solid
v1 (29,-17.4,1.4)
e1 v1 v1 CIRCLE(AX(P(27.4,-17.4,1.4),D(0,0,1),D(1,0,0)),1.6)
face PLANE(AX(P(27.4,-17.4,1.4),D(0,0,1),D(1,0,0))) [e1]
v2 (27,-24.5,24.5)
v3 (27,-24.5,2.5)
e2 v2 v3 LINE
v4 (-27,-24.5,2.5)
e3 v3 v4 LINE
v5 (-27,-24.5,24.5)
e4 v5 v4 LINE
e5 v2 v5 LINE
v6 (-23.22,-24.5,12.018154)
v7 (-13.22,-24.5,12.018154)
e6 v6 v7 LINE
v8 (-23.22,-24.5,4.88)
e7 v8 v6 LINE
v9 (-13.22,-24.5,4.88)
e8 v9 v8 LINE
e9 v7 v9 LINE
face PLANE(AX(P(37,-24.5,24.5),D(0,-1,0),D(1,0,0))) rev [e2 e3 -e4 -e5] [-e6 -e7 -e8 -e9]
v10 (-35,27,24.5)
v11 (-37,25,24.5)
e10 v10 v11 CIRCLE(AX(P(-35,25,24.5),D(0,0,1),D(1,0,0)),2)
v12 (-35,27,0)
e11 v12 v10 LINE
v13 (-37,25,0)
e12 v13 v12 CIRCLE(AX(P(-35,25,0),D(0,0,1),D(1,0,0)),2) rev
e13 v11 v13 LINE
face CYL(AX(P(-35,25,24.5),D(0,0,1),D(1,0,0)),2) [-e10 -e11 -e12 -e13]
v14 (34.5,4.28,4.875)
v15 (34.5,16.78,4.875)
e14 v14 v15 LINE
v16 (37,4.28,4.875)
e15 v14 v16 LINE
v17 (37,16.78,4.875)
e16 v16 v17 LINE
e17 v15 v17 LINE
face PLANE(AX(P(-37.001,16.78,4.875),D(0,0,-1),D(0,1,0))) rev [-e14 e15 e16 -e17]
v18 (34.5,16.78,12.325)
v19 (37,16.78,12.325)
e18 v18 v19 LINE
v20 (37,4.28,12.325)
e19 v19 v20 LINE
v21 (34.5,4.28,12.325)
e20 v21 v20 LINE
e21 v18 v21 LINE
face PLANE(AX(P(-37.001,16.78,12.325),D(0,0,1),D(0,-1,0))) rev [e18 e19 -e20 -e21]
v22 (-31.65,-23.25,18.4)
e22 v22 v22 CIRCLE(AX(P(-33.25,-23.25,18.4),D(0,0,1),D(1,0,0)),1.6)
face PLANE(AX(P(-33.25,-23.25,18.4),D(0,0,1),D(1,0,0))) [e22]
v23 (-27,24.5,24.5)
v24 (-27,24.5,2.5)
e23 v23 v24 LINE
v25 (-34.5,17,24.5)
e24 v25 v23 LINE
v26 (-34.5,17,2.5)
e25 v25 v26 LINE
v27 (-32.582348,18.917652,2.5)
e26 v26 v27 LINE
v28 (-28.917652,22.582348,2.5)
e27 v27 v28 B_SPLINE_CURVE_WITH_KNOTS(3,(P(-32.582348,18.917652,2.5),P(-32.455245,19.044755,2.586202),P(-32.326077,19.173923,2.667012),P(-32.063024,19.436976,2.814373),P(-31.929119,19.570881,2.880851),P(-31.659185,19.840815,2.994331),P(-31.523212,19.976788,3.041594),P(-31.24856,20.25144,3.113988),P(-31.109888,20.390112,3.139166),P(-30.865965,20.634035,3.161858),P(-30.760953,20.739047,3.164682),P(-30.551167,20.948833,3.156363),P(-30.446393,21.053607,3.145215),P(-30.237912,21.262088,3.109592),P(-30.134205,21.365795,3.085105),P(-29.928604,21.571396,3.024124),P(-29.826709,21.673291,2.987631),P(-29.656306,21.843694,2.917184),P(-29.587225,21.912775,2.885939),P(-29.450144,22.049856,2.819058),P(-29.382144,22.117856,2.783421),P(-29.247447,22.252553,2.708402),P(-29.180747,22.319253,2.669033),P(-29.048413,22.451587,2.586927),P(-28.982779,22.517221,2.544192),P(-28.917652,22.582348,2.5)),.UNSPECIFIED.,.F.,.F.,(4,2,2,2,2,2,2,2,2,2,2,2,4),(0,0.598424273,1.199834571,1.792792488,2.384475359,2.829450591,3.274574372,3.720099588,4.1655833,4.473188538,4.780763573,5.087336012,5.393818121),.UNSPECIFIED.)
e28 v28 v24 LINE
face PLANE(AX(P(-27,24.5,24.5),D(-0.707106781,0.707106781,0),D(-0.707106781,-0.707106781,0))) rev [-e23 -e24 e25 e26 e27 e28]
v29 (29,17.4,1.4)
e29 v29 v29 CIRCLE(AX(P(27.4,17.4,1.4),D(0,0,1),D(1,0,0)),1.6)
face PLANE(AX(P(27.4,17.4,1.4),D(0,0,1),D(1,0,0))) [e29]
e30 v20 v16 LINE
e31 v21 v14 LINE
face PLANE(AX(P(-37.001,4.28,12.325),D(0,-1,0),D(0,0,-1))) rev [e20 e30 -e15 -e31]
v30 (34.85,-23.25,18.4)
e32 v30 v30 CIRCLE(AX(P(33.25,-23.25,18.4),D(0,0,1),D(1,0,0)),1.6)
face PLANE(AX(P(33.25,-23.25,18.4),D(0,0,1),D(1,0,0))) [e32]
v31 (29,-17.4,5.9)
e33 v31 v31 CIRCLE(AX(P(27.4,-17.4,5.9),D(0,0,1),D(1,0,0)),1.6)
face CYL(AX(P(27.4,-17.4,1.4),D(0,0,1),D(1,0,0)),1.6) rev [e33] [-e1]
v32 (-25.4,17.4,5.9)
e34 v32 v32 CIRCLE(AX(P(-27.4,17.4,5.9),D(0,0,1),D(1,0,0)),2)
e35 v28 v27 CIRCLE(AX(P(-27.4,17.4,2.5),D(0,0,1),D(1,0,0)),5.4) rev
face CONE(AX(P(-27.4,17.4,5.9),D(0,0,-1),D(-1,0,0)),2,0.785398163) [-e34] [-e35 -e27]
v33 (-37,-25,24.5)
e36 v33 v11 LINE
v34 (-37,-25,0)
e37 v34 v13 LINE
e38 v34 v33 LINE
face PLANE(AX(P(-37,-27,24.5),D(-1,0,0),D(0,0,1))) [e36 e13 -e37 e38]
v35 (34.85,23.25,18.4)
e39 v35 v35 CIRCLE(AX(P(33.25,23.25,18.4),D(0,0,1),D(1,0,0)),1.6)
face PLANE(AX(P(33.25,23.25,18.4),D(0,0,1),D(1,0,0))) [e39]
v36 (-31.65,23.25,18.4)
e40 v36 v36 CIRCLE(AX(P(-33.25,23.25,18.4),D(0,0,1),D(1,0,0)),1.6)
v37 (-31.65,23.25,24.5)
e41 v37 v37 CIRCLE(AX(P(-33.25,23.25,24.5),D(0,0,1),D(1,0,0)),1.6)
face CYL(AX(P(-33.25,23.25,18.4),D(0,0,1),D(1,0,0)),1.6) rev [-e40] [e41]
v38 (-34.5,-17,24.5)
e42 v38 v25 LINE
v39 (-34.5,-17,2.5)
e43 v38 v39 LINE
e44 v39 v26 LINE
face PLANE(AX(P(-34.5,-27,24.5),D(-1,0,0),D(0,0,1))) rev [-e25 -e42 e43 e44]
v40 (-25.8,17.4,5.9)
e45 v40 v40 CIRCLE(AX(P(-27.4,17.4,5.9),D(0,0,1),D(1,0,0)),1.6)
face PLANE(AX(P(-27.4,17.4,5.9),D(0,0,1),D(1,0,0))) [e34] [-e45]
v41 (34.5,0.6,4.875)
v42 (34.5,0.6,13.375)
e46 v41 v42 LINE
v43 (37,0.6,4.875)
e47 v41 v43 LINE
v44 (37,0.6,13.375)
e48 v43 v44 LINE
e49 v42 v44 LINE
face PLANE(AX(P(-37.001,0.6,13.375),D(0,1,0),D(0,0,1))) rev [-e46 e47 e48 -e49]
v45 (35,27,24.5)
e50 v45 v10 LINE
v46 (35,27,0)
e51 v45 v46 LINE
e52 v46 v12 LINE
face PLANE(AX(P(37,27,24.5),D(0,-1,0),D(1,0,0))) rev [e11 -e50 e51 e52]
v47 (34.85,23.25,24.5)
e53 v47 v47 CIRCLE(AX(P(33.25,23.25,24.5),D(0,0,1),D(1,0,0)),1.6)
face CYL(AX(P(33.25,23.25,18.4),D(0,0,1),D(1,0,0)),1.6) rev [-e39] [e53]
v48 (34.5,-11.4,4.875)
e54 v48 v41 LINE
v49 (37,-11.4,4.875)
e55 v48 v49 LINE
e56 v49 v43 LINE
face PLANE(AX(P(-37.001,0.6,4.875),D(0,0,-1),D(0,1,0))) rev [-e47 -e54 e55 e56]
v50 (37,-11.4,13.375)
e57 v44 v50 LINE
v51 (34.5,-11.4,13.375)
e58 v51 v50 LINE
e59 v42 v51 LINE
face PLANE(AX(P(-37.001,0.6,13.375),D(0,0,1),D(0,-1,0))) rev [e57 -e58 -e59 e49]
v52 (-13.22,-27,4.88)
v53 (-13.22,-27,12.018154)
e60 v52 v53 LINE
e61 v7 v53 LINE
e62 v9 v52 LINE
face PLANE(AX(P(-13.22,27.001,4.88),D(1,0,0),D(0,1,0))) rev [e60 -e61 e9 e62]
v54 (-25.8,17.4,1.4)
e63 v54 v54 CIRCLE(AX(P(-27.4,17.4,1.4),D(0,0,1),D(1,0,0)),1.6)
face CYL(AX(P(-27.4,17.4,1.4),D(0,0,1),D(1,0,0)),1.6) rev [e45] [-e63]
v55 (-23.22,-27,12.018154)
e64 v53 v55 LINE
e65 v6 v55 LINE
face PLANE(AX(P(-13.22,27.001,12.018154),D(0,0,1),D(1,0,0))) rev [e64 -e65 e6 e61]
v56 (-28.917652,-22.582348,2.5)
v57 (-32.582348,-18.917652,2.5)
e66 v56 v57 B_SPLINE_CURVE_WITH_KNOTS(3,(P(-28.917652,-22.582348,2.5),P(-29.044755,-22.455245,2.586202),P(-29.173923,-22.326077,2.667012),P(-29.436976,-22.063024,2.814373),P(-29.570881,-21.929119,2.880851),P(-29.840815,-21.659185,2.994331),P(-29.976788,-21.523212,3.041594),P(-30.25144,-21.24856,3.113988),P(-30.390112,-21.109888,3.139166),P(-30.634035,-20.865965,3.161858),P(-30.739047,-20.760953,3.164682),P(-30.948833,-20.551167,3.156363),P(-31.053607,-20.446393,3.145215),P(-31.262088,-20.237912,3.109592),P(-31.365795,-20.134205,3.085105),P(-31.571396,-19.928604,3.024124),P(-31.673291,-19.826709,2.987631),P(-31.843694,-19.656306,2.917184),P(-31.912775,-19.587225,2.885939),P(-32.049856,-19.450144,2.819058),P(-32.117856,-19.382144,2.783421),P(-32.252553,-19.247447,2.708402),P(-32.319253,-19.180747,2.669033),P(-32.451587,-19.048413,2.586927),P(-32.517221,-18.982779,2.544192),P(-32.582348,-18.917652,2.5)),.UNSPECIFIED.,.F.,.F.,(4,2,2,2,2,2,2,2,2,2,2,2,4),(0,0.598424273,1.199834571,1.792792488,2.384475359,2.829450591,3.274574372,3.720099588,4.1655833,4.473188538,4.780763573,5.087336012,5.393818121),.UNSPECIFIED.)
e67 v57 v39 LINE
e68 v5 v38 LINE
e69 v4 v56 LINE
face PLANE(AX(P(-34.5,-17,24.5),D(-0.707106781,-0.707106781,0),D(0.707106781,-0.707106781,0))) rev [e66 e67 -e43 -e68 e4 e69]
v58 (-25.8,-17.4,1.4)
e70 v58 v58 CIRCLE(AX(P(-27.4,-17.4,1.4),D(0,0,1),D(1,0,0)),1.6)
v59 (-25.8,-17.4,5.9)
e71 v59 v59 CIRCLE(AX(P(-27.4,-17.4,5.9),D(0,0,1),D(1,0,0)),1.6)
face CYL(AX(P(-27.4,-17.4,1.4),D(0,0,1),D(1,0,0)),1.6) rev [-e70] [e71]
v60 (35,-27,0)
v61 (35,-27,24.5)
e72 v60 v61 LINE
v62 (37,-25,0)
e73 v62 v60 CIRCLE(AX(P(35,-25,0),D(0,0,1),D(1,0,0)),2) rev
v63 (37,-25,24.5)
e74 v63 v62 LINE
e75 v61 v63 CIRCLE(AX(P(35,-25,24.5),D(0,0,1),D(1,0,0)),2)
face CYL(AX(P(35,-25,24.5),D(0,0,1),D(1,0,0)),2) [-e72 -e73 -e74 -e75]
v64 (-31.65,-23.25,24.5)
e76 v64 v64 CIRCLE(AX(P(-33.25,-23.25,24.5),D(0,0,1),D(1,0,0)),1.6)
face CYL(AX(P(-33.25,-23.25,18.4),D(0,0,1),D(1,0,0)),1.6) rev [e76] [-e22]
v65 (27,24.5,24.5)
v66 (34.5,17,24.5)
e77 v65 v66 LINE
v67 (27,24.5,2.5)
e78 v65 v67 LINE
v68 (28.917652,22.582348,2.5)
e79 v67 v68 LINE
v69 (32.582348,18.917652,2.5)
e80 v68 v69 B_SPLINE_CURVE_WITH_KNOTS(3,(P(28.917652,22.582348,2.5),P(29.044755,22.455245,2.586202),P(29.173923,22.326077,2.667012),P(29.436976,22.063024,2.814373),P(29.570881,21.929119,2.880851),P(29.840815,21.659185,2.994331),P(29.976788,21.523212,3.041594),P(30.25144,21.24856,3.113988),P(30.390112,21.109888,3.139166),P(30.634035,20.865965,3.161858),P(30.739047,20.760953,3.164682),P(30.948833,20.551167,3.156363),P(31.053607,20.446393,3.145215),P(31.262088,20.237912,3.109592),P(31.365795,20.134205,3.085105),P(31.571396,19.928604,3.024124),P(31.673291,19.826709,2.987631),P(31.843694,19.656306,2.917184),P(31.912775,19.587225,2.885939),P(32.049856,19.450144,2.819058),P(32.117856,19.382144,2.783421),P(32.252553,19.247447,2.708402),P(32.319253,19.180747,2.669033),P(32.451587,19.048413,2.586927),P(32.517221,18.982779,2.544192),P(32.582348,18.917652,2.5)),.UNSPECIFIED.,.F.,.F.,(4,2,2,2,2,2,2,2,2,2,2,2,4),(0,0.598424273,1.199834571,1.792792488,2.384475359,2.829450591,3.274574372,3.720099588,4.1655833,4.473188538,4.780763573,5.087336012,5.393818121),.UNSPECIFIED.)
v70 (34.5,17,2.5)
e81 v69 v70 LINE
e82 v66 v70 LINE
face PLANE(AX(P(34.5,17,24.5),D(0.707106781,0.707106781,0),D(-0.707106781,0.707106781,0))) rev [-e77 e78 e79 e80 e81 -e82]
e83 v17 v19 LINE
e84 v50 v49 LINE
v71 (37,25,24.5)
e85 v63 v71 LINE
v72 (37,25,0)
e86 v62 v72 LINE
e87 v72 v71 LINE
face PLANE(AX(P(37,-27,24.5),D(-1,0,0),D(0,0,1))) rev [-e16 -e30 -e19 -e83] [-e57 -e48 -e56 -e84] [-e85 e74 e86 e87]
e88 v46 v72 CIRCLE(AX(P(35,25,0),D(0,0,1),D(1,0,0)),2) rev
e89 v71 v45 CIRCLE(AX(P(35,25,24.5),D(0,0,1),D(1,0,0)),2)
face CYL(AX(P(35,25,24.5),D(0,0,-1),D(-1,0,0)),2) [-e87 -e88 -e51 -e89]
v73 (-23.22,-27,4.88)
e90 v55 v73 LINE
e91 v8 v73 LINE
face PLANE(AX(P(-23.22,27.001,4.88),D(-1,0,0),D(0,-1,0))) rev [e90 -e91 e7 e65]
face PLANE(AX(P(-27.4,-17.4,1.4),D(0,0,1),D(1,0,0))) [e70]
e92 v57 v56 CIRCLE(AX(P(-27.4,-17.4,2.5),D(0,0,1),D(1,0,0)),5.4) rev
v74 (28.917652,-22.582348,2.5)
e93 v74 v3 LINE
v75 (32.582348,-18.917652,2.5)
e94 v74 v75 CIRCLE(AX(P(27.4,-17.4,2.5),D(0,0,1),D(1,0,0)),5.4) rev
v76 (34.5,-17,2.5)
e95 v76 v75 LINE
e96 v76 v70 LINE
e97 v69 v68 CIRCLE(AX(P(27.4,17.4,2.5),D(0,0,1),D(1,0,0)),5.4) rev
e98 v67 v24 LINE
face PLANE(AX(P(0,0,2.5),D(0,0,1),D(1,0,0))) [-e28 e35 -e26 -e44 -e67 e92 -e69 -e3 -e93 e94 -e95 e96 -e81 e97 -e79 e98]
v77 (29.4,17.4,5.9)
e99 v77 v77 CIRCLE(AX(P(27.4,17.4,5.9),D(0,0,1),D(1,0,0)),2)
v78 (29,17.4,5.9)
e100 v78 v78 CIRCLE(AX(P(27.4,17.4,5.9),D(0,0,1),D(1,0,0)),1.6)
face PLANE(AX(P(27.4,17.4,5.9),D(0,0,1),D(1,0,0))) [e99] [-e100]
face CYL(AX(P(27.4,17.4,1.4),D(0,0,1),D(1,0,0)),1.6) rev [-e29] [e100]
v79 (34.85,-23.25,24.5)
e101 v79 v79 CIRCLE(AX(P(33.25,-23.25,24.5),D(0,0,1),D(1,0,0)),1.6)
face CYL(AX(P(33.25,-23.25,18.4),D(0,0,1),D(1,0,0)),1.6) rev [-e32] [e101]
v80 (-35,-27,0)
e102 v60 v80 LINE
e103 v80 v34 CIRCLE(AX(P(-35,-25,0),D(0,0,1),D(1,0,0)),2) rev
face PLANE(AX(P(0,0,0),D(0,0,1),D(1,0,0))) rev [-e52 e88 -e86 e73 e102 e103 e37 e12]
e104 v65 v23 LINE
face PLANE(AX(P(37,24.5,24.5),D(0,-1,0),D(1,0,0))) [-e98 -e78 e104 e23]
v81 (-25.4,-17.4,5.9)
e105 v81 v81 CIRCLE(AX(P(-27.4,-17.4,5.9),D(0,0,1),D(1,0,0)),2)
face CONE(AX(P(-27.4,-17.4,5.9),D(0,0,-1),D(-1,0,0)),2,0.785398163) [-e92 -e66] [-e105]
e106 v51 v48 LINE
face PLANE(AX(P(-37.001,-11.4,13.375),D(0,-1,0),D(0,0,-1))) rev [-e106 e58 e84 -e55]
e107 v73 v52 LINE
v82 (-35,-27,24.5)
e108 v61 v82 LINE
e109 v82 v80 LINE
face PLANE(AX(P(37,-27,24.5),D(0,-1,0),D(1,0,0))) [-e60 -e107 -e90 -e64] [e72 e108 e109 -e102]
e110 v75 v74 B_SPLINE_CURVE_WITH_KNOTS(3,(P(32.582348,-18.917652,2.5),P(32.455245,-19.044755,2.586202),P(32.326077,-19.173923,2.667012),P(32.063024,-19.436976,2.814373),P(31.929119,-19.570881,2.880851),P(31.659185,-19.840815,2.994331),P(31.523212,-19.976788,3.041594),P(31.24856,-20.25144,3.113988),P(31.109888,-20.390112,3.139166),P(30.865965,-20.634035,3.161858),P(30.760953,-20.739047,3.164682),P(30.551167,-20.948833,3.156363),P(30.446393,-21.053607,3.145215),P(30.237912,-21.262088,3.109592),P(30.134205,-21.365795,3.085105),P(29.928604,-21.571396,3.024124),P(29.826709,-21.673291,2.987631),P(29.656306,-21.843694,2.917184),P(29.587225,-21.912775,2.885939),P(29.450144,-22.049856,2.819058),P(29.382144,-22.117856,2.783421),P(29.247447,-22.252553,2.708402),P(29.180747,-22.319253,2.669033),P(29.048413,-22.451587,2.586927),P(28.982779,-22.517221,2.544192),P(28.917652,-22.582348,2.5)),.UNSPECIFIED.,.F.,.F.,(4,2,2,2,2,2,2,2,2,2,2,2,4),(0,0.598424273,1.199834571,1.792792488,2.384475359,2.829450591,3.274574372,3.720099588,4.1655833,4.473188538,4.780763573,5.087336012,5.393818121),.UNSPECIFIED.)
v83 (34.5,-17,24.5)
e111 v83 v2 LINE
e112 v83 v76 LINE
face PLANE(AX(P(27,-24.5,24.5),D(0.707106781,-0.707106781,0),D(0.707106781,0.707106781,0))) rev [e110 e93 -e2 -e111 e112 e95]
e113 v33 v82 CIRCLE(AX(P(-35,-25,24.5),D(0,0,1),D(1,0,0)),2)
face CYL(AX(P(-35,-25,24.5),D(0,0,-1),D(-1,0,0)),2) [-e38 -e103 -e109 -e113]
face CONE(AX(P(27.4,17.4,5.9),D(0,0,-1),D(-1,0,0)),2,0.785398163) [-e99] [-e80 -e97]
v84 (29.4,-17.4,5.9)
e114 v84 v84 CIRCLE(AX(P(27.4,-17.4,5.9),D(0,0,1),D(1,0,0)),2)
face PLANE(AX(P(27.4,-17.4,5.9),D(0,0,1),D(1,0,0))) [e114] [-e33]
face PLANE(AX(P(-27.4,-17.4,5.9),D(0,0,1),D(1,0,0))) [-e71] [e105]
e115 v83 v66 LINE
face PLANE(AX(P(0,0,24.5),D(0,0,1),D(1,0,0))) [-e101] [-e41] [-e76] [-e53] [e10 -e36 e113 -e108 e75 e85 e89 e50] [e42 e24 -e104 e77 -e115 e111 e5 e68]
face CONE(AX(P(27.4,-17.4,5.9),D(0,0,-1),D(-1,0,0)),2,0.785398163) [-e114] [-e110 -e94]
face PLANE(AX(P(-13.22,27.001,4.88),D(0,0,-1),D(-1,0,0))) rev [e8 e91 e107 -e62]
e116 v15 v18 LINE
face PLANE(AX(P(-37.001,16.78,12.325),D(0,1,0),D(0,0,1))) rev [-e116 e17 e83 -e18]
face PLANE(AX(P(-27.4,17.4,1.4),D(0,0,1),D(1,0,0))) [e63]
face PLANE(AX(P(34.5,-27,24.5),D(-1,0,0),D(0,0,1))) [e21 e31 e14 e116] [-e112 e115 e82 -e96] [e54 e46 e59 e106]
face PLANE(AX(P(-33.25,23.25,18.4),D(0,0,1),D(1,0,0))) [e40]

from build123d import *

# Parameters (mm, degrees)
SKETCH5_W           = 74
SKETCH5_H           = 54
BOSS_EXTRUDE4_DEPTH = 24.5
SHELL1_T            = -2.5
SKETCH6_R           = 2
BOSS_EXTRUDE5_DEPTH = 3.4
SKETCH11_R          = 1.6
CUT_EXTRUDE2_DEPTH  = 4.5
CUT_EXTRUDE4_REACH  = 84.494
SKETCH12_W          = 7.45
SKETCH12_H          = 12.5
CUT_EXTRUDE5_REACH  = 84.494
SKETCH13_W          = 8.5
SKETCH13_H          = 12
CUT_EXTRUDE6_REACH  = 71.895
SKETCH14_W          = 10
SKETCH14_H          = 7.138154435
BOSS_EXTRUDE7_DEPTH = 22
SKETCH9_R           = 1.6
CUT_EXTRUDE1_DEPTH  = 6.1
CHAMFER10_SIZE      = 3.4
CHAMFER11_SIZE      = 3.4
FILLET1_R           = 2


with BuildPart() as part:
    # Sketch5 → Boss-Extrude4 (new body)
    with BuildSketch(Plane.XY):
        Rectangle(SKETCH5_W, SKETCH5_H)
    extrude(amount=BOSS_EXTRUDE4_DEPTH)

    # Shell1
    shell1_openings = [part.faces().sort_by_distance(p)[0] for p in [
        (0, 0, 24.5),
    ]]
    offset(amount=SHELL1_T, openings=shell1_openings, kind=Kind.INTERSECTION)

    # Sketch6 → Boss-Extrude5 (add)
    with BuildSketch(Plane.XY.offset(2.5)):
        with Locations((-27.4, 17.4)):
            Circle(SKETCH6_R)
        with Locations((27.4, 17.4)):
            Circle(SKETCH6_R)
        with Locations((27.4, -17.4)):
            Circle(SKETCH6_R)
        with Locations((-27.4, -17.4)):
            Circle(SKETCH6_R)
    extrude(amount=BOSS_EXTRUDE5_DEPTH)

    # Sketch11 → Cut-Extrude2 (cut)
    with BuildSketch(Plane.XY.offset(5.9)):
        with Locations((-27.4, 17.4)):
            Circle(SKETCH11_R)
        with Locations((27.4, 17.4)):
            Circle(SKETCH11_R)
        with Locations((-27.4, -17.4)):
            Circle(SKETCH11_R)
        with Locations((27.4, -17.4)):
            Circle(SKETCH11_R)
    extrude(amount=-CUT_EXTRUDE2_DEPTH, mode=Mode.SUBTRACT)

    # Sketch12 → Cut-Extrude4 (cut, up to next)
    with BuildSketch(Plane(origin=(37, 0, 0), x_dir=(0, 0, -1), z_dir=(1, 0, 0)), mode=Mode.PRIVATE) as cut_extrude4_sk1:
        with Locations((-8.6, 10.53)):
            Rectangle(SKETCH12_W, SKETCH12_H)
    cut_extrude4_tool1 = extrude(cut_extrude4_sk1.sketch, amount=-CUT_EXTRUDE4_REACH, mode=Mode.PRIVATE) & part.part
    add(cut_extrude4_tool1.solids().sort_by_distance((37, 10.53, 8.6))[0], mode=Mode.SUBTRACT)

    # Sketch13 → Cut-Extrude5 (cut, up to next)
    with BuildSketch(Plane(origin=(37, 0, 0), x_dir=(0, 0, -1), z_dir=(1, 0, 0)), mode=Mode.PRIVATE) as cut_extrude5_sk1:
        with Locations((-9.125, -5.4)):
            Rectangle(SKETCH13_W, SKETCH13_H)
    cut_extrude5_tool1 = extrude(cut_extrude5_sk1.sketch, amount=-CUT_EXTRUDE5_REACH, mode=Mode.PRIVATE) & part.part
    add(cut_extrude5_tool1.solids().sort_by_distance((37, -5.4, 9.125))[0], mode=Mode.SUBTRACT)

    # Sketch14 → Cut-Extrude6 (cut, up to next)
    with BuildSketch(Plane.XZ.offset(27), mode=Mode.PRIVATE) as cut_extrude6_sk1:
        with Locations((-18.22, 8.449077218)):
            Rectangle(SKETCH14_W, SKETCH14_H)
    cut_extrude6_tool1 = extrude(cut_extrude6_sk1.sketch, amount=-CUT_EXTRUDE6_REACH, mode=Mode.PRIVATE) & part.part
    add(cut_extrude6_tool1.solids().sort_by_distance((-18.22, -27, 8.449077))[0], mode=Mode.SUBTRACT)

    # Sketch7 → Boss-Extrude7 (add)
    with BuildSketch(Plane.XY.offset(2.5)):
        Polygon((-27, 24.5), (-34.5, 17), (-34.5, 24.5), align=None)
        Polygon((-34.5, -17), (-27, -24.5), (-34.5, -24.5), align=None)
        Polygon((27, -24.5), (34.5, -17), (34.5, -24.5), align=None)
        Polygon((34.5, 17), (27, 24.5), (34.5, 24.5), align=None)
    extrude(amount=BOSS_EXTRUDE7_DEPTH)

    # Sketch9 → Cut-Extrude1 (cut)
    with BuildSketch(Plane.XY.offset(24.5)):
        with Locations((-33.25, 23.25)):
            Circle(SKETCH9_R)
        with Locations((33.25, 23.25)):
            Circle(SKETCH9_R)
        with Locations((-33.25, -23.25)):
            Circle(SKETCH9_R)
        with Locations((33.25, -23.25)):
            Circle(SKETCH9_R)
    extrude(amount=-CUT_EXTRUDE1_DEPTH, mode=Mode.SUBTRACT)

    # Chamfer10
    # the kernel refuses this chamfer: 3.4 mm, written as the material it adds along each edge
    with BuildSketch(Plane(origin=(-27.4, 17.4, 2.5), x_dir=(1, 0, 0), z_dir=(0, -1, 0))) as chamfer10_piece_1_section:
        Polygon((2 + CHAMFER10_SIZE, 0), (2, CHAMFER10_SIZE), (2, 0), align=None)
    chamfer10_piece_1 = revolve(axis=Axis((-27.4, 17.4, 2.5), (0, 0, 1)), mode=Mode.PRIVATE)
    chamfer10_piece_1 = split(chamfer10_piece_1, bisect_by=Plane(origin=(-31.112764442, 17.4, 5.9), z_dir=(0, 0, -1)), keep=Keep.TOP, mode=Mode.PRIVATE)
    add(chamfer10_piece_1)

    # Chamfer11
    # the kernel refuses this chamfer: 3.4 mm, written as the material it adds along each edge
    with BuildSketch(Plane(origin=(27.4, 17.4, 2.5), x_dir=(1, 0, 0), z_dir=(0, -1, 0))) as chamfer11_piece_1_section:
        Polygon((2 + CHAMFER11_SIZE, 0), (2, CHAMFER11_SIZE), (2, 0), align=None)
    chamfer11_piece_1 = revolve(axis=Axis((27.4, 17.4, 2.5), (0, 0, 1)), mode=Mode.PRIVATE)
    chamfer11_piece_1 = split(chamfer11_piece_1, bisect_by=Plane(origin=(23.687235558, 17.4, 5.9), z_dir=(0, 0, -1)), keep=Keep.TOP, mode=Mode.PRIVATE)
    add(chamfer11_piece_1)
    with BuildSketch(Plane(origin=(27.4, -17.4, 2.5), x_dir=(1, 0, 0), z_dir=(0, -1, 0))) as chamfer11_piece_2_section:
        Polygon((2 + CHAMFER11_SIZE, 0), (2, CHAMFER11_SIZE), (2, 0), align=None)
    chamfer11_piece_2 = revolve(axis=Axis((27.4, -17.4, 2.5), (0, 0, 1)), mode=Mode.PRIVATE)
    chamfer11_piece_2 = split(chamfer11_piece_2, bisect_by=Plane(origin=(23.687235558, -17.4, 5.9), z_dir=(0, 0, -1)), keep=Keep.TOP, mode=Mode.PRIVATE)
    add(chamfer11_piece_2)
    with BuildSketch(Plane(origin=(-27.4, -17.4, 2.5), x_dir=(1, 0, 0), z_dir=(0, -1, 0))) as chamfer11_piece_3_section:
        Polygon((2 + CHAMFER11_SIZE, 0), (2, CHAMFER11_SIZE), (2, 0), align=None)
    chamfer11_piece_3 = revolve(axis=Axis((-27.4, -17.4, 2.5), (0, 0, 1)), mode=Mode.PRIVATE)
    chamfer11_piece_3 = split(chamfer11_piece_3, bisect_by=Plane(origin=(-31.112764442, -17.4, 5.9), z_dir=(0, 0, -1)), keep=Keep.TOP, mode=Mode.PRIVATE)
    add(chamfer11_piece_3)

    # Fillet1
    fillet1_edges = [part.edges().sort_by_distance(p)[0] for p in [
        (37, -27, 12.25),
        (-37, -27, 12.25),
        (-37, 27, 12.25),
        (37, 27, 12.25),
    ]]
    fillet(fillet1_edges, radius=FILLET1_R)


solid = part.part
